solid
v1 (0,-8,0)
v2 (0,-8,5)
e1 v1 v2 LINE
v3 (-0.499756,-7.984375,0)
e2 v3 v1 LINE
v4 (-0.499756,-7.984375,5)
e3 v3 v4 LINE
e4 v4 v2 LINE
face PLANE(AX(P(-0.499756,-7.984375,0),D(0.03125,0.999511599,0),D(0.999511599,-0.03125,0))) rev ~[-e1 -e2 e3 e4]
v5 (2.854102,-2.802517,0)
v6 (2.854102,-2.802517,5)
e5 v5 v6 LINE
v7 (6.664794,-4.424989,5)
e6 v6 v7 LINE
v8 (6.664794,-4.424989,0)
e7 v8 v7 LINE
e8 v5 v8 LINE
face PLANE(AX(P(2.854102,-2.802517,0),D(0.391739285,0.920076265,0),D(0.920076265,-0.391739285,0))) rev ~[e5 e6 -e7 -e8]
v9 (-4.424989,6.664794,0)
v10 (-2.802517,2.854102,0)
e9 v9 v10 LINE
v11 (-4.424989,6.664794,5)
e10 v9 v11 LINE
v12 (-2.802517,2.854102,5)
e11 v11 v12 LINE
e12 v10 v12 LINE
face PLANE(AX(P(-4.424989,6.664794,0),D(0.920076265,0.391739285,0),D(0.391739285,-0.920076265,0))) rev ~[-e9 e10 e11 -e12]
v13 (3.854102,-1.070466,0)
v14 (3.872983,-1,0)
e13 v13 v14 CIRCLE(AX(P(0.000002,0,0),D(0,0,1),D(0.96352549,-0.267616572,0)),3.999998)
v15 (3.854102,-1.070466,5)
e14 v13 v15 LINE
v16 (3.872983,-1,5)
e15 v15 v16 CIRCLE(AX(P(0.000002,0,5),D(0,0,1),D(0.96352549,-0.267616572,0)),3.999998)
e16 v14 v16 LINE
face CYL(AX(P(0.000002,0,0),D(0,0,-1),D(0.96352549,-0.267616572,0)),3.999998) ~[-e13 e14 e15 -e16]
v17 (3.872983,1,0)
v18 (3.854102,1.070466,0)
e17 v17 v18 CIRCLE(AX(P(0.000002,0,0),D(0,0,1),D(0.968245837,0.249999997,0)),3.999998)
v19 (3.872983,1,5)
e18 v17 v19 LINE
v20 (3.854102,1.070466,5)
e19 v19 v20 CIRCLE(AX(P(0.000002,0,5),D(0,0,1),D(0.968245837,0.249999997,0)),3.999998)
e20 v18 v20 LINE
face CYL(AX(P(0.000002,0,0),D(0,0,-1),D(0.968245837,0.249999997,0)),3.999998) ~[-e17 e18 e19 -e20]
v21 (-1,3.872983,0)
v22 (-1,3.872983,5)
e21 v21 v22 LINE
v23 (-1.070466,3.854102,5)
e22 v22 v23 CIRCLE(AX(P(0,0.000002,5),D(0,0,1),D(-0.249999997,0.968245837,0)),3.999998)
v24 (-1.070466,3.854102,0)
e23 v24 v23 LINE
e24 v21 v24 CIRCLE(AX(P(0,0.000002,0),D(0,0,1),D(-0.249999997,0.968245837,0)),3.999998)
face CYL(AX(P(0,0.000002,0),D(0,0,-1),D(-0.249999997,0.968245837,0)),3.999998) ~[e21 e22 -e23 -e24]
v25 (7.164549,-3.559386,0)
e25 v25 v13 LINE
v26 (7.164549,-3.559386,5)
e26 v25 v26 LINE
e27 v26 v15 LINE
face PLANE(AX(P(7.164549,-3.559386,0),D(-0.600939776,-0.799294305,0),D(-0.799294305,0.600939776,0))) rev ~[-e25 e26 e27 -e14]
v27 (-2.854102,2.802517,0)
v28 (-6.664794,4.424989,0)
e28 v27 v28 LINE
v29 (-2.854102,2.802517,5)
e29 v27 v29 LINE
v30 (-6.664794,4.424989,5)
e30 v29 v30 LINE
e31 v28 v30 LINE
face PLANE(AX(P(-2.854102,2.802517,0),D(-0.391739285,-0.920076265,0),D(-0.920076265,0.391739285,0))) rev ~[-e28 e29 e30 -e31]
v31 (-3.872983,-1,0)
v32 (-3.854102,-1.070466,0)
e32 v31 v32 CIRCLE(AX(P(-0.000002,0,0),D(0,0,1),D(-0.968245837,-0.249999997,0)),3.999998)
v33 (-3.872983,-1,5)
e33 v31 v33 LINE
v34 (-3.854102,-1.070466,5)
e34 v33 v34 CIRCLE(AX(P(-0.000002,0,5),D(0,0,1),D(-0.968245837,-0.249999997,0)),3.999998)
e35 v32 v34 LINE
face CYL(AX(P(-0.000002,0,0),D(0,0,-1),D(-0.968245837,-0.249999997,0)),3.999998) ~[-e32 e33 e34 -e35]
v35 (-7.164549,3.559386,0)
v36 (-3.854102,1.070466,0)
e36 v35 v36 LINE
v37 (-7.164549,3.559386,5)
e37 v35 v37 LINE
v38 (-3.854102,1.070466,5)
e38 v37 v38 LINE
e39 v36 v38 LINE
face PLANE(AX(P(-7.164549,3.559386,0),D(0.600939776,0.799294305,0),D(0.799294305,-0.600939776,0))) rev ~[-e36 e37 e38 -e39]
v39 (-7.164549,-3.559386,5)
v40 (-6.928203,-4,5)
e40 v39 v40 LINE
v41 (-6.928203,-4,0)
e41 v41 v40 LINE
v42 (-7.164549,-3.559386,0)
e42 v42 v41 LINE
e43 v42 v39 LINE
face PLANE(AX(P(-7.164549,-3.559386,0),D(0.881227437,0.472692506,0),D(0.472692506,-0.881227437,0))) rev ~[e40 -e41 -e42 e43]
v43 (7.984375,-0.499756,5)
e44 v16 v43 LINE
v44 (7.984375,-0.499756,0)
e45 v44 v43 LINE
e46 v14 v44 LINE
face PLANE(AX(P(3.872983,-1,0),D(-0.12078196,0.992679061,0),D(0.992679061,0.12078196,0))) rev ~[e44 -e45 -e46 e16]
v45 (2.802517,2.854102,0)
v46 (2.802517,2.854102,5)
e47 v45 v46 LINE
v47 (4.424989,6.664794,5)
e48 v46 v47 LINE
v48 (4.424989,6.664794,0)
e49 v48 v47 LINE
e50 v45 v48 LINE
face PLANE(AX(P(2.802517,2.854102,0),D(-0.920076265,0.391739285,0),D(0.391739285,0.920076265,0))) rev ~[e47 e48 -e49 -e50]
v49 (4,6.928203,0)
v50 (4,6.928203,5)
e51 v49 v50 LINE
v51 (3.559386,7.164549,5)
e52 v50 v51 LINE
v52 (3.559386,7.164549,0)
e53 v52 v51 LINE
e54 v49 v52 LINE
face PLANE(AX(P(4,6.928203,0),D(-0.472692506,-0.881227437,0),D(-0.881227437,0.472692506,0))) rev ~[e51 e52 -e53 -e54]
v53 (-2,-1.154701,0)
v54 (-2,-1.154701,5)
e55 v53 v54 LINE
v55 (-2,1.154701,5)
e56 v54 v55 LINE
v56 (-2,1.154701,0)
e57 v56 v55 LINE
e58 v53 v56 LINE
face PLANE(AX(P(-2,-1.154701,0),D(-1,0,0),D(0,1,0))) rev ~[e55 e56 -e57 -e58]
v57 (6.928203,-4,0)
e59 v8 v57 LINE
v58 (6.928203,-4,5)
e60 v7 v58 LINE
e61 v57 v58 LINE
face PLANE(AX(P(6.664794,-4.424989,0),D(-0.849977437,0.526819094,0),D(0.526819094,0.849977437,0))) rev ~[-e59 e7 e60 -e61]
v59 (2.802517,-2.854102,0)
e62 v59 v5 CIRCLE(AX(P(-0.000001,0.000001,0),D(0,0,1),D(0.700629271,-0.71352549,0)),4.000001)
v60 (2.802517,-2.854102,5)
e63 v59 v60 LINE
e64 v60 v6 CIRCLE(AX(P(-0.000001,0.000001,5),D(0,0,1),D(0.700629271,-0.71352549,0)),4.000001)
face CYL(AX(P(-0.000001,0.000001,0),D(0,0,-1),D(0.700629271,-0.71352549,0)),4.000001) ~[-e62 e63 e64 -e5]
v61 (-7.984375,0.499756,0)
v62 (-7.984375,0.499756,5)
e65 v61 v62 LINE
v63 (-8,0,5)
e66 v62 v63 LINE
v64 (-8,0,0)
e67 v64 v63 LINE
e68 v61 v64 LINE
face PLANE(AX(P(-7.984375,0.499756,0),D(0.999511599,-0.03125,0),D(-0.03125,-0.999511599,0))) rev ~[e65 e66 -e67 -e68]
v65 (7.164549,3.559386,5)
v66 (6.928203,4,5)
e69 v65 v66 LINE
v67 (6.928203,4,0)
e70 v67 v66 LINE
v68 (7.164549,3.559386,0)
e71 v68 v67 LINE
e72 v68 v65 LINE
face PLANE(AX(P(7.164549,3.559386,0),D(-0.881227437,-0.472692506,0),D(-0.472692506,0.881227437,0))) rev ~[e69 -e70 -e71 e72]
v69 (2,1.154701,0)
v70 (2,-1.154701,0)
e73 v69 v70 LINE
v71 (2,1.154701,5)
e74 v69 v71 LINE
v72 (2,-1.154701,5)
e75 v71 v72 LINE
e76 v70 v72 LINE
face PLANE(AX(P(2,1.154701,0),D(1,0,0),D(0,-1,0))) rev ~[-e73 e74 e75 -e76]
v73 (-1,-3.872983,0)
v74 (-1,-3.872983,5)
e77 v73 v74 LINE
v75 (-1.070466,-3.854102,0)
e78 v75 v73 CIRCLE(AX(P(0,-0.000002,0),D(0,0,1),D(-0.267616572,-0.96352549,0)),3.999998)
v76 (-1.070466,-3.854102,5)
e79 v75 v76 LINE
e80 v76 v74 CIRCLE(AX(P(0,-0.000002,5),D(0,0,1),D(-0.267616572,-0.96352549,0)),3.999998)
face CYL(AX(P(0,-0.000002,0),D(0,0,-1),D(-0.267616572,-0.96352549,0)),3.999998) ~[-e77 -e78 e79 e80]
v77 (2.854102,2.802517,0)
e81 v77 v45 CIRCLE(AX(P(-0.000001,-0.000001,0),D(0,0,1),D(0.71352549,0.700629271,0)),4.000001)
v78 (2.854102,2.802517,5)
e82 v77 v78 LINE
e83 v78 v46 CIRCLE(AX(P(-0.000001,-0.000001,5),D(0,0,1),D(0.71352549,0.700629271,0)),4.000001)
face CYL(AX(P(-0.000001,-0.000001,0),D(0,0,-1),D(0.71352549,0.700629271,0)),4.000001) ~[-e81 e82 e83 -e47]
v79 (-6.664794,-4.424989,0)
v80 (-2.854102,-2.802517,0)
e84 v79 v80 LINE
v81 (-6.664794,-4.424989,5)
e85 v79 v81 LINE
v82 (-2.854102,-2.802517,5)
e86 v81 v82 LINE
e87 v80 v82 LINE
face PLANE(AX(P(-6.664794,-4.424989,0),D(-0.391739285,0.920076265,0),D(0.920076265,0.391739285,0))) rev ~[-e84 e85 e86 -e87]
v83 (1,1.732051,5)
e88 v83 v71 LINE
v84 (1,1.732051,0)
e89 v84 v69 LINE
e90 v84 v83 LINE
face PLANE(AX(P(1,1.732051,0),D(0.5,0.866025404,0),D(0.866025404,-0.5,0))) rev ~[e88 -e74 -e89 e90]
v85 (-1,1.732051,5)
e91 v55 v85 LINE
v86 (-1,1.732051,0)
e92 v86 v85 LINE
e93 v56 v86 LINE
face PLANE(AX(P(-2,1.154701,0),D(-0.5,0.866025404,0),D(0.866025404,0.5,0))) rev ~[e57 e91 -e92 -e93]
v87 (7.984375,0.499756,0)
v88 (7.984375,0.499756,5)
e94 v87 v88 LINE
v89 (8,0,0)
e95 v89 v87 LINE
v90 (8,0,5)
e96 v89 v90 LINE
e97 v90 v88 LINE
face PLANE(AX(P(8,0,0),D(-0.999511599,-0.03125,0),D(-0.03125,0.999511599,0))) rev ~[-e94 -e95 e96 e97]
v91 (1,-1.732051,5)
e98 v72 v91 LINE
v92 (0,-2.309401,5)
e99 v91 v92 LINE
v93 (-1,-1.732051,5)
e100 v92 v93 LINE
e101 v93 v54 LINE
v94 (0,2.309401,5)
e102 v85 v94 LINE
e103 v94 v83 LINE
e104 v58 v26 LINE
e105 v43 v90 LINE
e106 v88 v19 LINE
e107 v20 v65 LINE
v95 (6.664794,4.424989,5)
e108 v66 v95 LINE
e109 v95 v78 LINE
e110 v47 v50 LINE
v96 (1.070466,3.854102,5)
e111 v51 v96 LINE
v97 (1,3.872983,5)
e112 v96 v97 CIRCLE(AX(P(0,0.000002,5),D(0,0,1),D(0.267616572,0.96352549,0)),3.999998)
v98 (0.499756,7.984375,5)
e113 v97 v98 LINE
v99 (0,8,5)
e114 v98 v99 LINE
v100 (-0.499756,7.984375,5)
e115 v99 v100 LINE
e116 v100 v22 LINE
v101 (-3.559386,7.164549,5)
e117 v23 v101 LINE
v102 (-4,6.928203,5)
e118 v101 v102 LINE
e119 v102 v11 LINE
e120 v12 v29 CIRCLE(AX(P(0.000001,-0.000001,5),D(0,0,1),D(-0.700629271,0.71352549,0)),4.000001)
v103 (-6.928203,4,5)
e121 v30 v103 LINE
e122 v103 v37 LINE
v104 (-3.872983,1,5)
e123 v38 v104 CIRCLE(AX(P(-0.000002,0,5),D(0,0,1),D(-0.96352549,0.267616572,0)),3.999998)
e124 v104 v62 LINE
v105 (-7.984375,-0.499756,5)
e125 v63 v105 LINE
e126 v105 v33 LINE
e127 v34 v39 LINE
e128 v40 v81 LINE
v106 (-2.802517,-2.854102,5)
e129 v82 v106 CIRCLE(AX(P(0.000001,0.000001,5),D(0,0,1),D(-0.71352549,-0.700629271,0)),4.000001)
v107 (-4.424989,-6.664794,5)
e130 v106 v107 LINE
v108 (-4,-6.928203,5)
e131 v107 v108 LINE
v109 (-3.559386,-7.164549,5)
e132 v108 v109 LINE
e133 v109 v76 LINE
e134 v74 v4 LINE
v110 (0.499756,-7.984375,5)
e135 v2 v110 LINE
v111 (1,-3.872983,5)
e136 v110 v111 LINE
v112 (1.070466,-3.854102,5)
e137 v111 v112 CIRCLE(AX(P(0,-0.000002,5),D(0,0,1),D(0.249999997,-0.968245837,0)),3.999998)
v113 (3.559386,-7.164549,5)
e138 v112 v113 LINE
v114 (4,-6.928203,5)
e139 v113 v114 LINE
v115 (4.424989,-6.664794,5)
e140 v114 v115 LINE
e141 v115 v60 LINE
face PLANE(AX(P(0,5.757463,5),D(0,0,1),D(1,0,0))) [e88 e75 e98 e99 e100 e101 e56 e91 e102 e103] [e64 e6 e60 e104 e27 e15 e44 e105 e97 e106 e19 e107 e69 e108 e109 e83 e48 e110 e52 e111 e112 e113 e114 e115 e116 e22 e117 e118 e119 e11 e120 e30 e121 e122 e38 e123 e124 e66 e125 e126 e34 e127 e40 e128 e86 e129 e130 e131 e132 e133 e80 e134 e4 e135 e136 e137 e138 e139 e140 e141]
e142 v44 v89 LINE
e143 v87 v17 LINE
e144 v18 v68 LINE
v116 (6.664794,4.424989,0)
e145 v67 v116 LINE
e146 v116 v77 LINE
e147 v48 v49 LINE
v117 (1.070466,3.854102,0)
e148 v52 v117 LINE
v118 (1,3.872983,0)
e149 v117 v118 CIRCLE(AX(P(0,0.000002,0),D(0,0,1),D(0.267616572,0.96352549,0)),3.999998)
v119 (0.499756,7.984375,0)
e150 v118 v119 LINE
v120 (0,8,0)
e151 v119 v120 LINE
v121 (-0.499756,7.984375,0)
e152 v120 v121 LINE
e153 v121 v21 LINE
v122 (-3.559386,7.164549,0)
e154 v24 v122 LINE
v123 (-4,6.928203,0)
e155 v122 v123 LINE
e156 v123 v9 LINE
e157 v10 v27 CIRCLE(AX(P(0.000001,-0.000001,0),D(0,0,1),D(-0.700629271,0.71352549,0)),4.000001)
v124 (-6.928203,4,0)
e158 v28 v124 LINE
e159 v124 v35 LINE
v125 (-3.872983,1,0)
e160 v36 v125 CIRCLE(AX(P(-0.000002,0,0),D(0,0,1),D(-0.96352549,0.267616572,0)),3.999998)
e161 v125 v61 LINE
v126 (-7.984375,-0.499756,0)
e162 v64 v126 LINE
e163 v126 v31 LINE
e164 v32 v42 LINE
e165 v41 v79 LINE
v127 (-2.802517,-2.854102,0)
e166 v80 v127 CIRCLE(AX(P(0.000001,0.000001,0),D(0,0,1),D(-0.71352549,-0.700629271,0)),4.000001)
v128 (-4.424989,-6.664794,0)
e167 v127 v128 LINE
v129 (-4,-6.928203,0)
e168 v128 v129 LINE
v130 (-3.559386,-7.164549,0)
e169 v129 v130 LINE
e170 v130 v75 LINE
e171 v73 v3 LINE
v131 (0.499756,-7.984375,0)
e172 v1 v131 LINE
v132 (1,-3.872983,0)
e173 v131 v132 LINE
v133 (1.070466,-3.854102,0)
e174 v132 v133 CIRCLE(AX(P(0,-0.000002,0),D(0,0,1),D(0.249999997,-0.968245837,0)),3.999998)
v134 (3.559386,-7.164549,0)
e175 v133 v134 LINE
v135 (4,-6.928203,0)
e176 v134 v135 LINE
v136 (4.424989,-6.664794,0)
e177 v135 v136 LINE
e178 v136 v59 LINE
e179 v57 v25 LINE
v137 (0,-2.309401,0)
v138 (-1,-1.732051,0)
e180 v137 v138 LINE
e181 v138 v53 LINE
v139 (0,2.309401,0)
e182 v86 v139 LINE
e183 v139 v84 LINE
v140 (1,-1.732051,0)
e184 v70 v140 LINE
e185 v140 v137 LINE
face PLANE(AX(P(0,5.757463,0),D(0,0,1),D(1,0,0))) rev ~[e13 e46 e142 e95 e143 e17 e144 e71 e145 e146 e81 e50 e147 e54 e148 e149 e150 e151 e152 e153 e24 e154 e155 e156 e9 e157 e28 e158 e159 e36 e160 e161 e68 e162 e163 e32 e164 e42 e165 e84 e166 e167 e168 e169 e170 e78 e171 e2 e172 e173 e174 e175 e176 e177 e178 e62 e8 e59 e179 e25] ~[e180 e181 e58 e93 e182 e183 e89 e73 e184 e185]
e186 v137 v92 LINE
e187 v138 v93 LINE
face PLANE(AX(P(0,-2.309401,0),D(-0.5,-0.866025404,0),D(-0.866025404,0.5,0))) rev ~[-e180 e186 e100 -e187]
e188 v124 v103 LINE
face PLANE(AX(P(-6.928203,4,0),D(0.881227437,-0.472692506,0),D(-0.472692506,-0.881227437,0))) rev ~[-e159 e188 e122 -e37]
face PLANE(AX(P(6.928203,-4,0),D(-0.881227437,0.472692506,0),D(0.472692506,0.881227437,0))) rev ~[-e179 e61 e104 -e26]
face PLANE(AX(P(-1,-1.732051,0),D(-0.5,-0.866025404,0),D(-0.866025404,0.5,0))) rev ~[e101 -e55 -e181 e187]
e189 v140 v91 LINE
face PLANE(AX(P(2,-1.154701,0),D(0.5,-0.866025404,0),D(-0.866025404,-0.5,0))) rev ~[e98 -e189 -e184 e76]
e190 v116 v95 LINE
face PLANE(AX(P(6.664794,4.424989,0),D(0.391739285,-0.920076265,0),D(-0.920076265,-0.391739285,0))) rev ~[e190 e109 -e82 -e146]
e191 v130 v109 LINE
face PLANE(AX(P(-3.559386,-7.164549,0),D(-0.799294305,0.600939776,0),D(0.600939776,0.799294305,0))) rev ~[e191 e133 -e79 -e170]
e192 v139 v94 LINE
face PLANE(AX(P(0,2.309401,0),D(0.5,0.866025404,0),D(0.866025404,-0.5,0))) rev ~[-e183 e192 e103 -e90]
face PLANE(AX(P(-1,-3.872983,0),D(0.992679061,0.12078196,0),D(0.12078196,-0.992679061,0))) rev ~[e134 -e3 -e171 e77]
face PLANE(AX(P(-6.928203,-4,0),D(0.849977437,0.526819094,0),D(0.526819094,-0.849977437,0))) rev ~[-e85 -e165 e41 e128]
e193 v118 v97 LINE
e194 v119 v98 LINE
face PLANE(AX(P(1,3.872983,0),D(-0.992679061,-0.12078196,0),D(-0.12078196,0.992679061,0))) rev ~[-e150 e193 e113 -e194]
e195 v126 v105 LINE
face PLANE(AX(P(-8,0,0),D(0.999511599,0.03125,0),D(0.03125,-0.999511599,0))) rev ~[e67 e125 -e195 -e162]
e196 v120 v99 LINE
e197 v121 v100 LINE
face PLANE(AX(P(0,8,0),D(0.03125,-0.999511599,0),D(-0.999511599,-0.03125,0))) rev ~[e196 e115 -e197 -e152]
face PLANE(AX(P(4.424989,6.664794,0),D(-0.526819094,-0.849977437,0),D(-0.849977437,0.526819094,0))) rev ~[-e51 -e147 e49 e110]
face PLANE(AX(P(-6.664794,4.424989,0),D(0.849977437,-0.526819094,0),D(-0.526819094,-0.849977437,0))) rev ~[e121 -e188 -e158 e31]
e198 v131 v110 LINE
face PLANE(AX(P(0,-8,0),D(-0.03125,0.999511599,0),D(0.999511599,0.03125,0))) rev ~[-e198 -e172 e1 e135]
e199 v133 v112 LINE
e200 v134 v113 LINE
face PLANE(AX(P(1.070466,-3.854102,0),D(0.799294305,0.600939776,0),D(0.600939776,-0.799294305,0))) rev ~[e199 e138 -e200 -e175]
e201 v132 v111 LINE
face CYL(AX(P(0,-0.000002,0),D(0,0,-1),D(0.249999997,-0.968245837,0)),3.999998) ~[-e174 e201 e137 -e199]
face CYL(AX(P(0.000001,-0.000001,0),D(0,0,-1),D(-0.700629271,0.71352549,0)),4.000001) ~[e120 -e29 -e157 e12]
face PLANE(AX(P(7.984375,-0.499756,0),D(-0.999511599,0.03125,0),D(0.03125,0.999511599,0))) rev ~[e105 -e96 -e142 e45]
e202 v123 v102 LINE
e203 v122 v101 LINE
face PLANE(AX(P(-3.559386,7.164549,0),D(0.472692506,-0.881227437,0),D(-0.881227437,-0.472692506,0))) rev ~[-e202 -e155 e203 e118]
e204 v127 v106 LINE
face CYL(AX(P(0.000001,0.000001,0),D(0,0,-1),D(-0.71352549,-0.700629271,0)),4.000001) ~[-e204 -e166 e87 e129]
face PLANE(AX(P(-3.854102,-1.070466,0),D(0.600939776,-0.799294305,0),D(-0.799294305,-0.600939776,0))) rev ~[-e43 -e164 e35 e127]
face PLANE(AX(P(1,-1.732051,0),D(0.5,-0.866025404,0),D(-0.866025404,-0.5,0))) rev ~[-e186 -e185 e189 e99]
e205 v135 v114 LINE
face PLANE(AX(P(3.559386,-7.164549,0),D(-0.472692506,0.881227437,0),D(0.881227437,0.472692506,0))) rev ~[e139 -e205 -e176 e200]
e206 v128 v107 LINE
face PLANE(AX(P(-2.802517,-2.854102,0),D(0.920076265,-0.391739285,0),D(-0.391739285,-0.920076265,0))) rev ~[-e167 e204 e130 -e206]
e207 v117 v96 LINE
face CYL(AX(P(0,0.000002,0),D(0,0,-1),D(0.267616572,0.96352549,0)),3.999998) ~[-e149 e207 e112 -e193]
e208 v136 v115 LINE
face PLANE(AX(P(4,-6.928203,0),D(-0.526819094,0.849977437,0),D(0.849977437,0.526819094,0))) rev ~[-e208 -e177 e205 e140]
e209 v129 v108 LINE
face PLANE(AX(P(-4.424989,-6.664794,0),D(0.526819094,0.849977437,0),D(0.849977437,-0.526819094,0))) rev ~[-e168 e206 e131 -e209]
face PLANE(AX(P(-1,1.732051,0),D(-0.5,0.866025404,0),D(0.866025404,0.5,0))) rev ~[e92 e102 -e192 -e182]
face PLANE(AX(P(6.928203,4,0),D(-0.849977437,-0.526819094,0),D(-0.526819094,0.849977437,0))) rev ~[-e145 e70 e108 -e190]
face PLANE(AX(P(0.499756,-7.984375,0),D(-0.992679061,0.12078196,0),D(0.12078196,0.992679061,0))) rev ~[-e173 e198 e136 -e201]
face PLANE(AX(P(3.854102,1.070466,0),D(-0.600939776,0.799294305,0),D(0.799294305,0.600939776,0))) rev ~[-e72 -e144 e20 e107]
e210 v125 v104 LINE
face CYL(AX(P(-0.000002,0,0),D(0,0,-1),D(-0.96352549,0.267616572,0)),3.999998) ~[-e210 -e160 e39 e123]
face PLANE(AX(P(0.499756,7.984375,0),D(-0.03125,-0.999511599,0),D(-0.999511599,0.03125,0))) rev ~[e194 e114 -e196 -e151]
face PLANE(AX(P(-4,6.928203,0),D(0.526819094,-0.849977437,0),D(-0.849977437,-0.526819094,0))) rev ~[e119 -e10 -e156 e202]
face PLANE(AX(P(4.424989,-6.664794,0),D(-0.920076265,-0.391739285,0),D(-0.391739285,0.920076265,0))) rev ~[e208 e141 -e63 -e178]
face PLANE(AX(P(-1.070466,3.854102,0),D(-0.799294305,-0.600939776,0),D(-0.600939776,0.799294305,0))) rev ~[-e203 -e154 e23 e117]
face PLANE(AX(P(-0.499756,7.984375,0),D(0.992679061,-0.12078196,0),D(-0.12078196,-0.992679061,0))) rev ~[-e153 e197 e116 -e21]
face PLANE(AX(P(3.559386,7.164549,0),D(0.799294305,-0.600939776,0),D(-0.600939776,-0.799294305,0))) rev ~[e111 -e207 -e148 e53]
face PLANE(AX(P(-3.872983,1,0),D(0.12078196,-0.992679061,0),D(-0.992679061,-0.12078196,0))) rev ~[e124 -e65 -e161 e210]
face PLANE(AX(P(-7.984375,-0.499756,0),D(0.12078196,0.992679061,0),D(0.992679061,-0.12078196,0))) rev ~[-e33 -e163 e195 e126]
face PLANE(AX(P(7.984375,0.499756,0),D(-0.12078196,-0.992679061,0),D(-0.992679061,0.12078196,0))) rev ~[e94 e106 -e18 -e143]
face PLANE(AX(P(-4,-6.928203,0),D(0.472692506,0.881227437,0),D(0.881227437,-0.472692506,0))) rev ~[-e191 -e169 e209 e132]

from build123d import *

# Parameters (mm, degrees)
F1_DEPTH = 5


# Not quite as in the source:
# - a feature names something its author has since deleted; it is built from what else it names


with BuildPart() as f1:
    # F0 (on Top) → F1 (new body)
    with BuildSketch(Plane.XY):
        with BuildLine():
            ThreePointArc((-1, 3.8729833462), (0, 4), (1, 3.8729833462))
            Line((1, 3.8729833462), (0.4997557997, 7.984375))
            Line((0.4997557997, 7.984375), (0, 8))
            Line((0, 8), (-0.4997557997, 7.984375))
            Line((-0.4997557997, 7.984375), (-1, 3.8729833462))
        make_face()
        with BuildLine():
            ThreePointArc((4, 0), (3.9681187851, 0.5040171699), (3.8729833462, 1))
            ThreePointArc((3.8729833462, 1), (3.8637033052, 1.0352761804), (3.8541019662, 1.0704662693))
            ThreePointArc((3.8541019662, 1.0704662693), (3.4641016151, 2), (2.8541019662, 2.8025170769))
            ThreePointArc((2.8541019662, 2.8025170769), (2.8284271247, 2.8284271247), (2.8025170769, 2.8541019662))
            ThreePointArc((2.8025170769, 2.8541019662), (2, 3.4641016151), (1.0704662693, 3.8541019662))
            ThreePointArc((1.0704662693, 3.8541019662), (1.0352761804, 3.8637033052), (1, 3.8729833462))
            ThreePointArc((1, 3.8729833462), (0, 4), (-1, 3.8729833462))
            ThreePointArc((-1, 3.8729833462), (-1.0352761804, 3.8637033052), (-1.0704662693, 3.8541019662))
            ThreePointArc((-1.0704662693, 3.8541019662), (-2, 3.4641016151), (-2.8025170769, 2.8541019662))
            ThreePointArc((-2.8025170769, 2.8541019662), (-2.8284271247, 2.8284271247), (-2.8541019662, 2.8025170769))
            ThreePointArc((-2.8541019662, 2.8025170769), (-3.4641016151, 2), (-3.8541019662, 1.0704662693))
            ThreePointArc((-3.8541019662, 1.0704662693), (-3.8637033052, 1.0352761804), (-3.8729833462, 1))
            ThreePointArc((-3.8729833462, 1), (-4, 0), (-3.8729833462, -1))
            ThreePointArc((-3.8729833462, -1), (-3.8637033052, -1.0352761804), (-3.8541019662, -1.0704662693))
            ThreePointArc((-3.8541019662, -1.0704662693), (-3.4641016151, -2), (-2.8541019662, -2.8025170769))
            ThreePointArc((-2.8541019662, -2.8025170769), (-2.8284271247, -2.8284271247), (-2.8025170769, -2.8541019662))
            ThreePointArc((-2.8025170769, -2.8541019662), (-2, -3.4641016151), (-1.0704662693, -3.8541019662))
            ThreePointArc((-1.0704662693, -3.8541019662), (-1.0352761804, -3.8637033052), (-1, -3.8729833462))
            ThreePointArc((-1, -3.8729833462), (0, -4), (1, -3.8729833462))
            ThreePointArc((1, -3.8729833462), (1.0352761804, -3.8637033052), (1.0704662693, -3.8541019662))
            ThreePointArc((1.0704662693, -3.8541019662), (2, -3.4641016151), (2.8025170769, -2.8541019662))
            ThreePointArc((2.8025170769, -2.8541019662), (2.8284271247, -2.8284271247), (2.8541019662, -2.8025170769))
            ThreePointArc((2.8541019662, -2.8025170769), (3.4641016151, -2), (3.8541019662, -1.0704662693))
            ThreePointArc((3.8541019662, -1.0704662693), (3.8637033052, -1.0352761804), (3.8729833462, -1))
            ThreePointArc((3.8729833462, -1), (3.9681187851, -0.5040171699), (4, 0))
        make_face()
        Polygon((2, 1.1547005384), (2, 0), (2, -1.1547005384), (1.0000000433, -1.7320507826), (0, -2.3094010768), (-1.0000000161, -1.7320507983), (-2, -1.1547005384), (-2, 0), (-2, 1.1547005384), (-1.0000000433, 1.7320507826), (0, 2.3094010768), (0.9999999889, 1.732050814), align=None, mode=Mode.SUBTRACT)
        with BuildLine():
            Line((2.8025170769, 2.8541019662), (4.4249887183, 6.6647936835))
            Line((4.4249887183, 6.6647936835), (4, 6.9282032303))
            Line((4, 6.9282032303), (3.5593862817, 7.1645494832))
            Line((3.5593862817, 7.1645494832), (1.0704662693, 3.8541019662))
            ThreePointArc((1.0704662693, 3.8541019662), (2, 3.4641016151), (2.8025170769, 2.8541019662))
        make_face()
        with BuildLine():
            Line((3.8541019662, 1.0704662693), (7.1645494832, 3.5593862817))
            Line((7.1645494832, 3.5593862817), (6.9282032303, 4))
            Line((6.9282032303, 4), (6.6647936835, 4.4249887183))
            Line((6.6647936835, 4.4249887183), (2.8541019662, 2.8025170769))
            ThreePointArc((2.8541019662, 2.8025170769), (3.4641016151, 2), (3.8541019662, 1.0704662693))
        make_face()
        with BuildLine():
            Line((7.984375, -0.4997557997), (8, 0))
            Line((8, 0), (7.984375, 0.4997557997))
            Line((7.984375, 0.4997557997), (3.8729833462, 1))
            ThreePointArc((3.8729833462, 1), (3.9681187851, 0.5040171699), (4, 0))
            ThreePointArc((4, 0), (3.9681187851, -0.5040171699), (3.8729833462, -1))
            Line((3.8729833462, -1), (7.984375, -0.4997557997))
        make_face()
        with BuildLine():
            Line((6.9282032303, -4), (7.1645494832, -3.5593862817))
            Line((7.1645494832, -3.5593862817), (3.8541019662, -1.0704662693))
            ThreePointArc((3.8541019662, -1.0704662693), (3.4641016151, -2), (2.8541019662, -2.8025170769))
            Line((2.8541019662, -2.8025170769), (6.6647936835, -4.4249887183))
            Line((6.6647936835, -4.4249887183), (6.9282032303, -4))
        make_face()
        with BuildLine():
            Line((4, -6.9282032303), (4.4249887183, -6.6647936835))
            Line((4.4249887183, -6.6647936835), (2.8025170769, -2.8541019662))
            ThreePointArc((2.8025170769, -2.8541019662), (2, -3.4641016151), (1.0704662693, -3.8541019662))
            Line((1.0704662693, -3.8541019662), (3.5593862817, -7.1645494832))
            Line((3.5593862817, -7.1645494832), (4, -6.9282032303))
        make_face()
        with BuildLine():
            Line((0.4997557997, -7.984375), (1, -3.8729833462))
            ThreePointArc((1, -3.8729833462), (0, -4), (-1, -3.8729833462))
            Line((-1, -3.8729833462), (-0.4997557997, -7.984375))
            Line((-0.4997557997, -7.984375), (0, -8))
            Line((0, -8), (0.4997557997, -7.984375))
        make_face()
        with BuildLine():
            Line((-3.5593862817, -7.1645494832), (-1.0704662693, -3.8541019662))
            ThreePointArc((-1.0704662693, -3.8541019662), (-2, -3.4641016151), (-2.8025170769, -2.8541019662))
            Line((-2.8025170769, -2.8541019662), (-4.4249887183, -6.6647936835))
            Line((-4.4249887183, -6.6647936835), (-4, -6.9282032303))
            Line((-4, -6.9282032303), (-3.5593862817, -7.1645494832))
        make_face()
        with BuildLine():
            Line((-6.6647936835, -4.4249887183), (-2.8541019662, -2.8025170769))
            ThreePointArc((-2.8541019662, -2.8025170769), (-3.4641016151, -2), (-3.8541019662, -1.0704662693))
            Line((-3.8541019662, -1.0704662693), (-7.1645494832, -3.5593862817))
            Line((-7.1645494832, -3.5593862817), (-6.9282032303, -4))
            Line((-6.9282032303, -4), (-6.6647936835, -4.4249887183))
        make_face()
        with BuildLine():
            ThreePointArc((-3.8729833462, -1), (-4, 0), (-3.8729833462, 1))
            Line((-3.8729833462, 1), (-7.984375, 0.4997557997))
            Line((-7.984375, 0.4997557997), (-8, 0))
            Line((-8, 0), (-7.984375, -0.4997557997))
            Line((-7.984375, -0.4997557997), (-3.8729833462, -1))
        make_face()
        with BuildLine():
            ThreePointArc((-3.8541019662, 1.0704662693), (-3.4641016151, 2), (-2.8541019662, 2.8025170769))
            Line((-2.8541019662, 2.8025170769), (-6.6647936835, 4.4249887183))
            Line((-6.6647936835, 4.4249887183), (-6.9282032303, 4))
            Line((-6.9282032303, 4), (-7.1645494832, 3.5593862817))
            Line((-7.1645494832, 3.5593862817), (-3.8541019662, 1.0704662693))
        make_face()
        with BuildLine():
            ThreePointArc((-2.8025170769, 2.8541019662), (-2, 3.4641016151), (-1.0704662693, 3.8541019662))
            Line((-1.0704662693, 3.8541019662), (-3.5593862817, 7.1645494832))
            Line((-3.5593862817, 7.1645494832), (-4, 6.9282032303))
            Line((-4, 6.9282032303), (-4.4249887183, 6.6647936835))
            Line((-4.4249887183, 6.6647936835), (-2.8025170769, 2.8541019662))
        make_face()
    extrude(amount=F1_DEPTH)


solid = f1.part
